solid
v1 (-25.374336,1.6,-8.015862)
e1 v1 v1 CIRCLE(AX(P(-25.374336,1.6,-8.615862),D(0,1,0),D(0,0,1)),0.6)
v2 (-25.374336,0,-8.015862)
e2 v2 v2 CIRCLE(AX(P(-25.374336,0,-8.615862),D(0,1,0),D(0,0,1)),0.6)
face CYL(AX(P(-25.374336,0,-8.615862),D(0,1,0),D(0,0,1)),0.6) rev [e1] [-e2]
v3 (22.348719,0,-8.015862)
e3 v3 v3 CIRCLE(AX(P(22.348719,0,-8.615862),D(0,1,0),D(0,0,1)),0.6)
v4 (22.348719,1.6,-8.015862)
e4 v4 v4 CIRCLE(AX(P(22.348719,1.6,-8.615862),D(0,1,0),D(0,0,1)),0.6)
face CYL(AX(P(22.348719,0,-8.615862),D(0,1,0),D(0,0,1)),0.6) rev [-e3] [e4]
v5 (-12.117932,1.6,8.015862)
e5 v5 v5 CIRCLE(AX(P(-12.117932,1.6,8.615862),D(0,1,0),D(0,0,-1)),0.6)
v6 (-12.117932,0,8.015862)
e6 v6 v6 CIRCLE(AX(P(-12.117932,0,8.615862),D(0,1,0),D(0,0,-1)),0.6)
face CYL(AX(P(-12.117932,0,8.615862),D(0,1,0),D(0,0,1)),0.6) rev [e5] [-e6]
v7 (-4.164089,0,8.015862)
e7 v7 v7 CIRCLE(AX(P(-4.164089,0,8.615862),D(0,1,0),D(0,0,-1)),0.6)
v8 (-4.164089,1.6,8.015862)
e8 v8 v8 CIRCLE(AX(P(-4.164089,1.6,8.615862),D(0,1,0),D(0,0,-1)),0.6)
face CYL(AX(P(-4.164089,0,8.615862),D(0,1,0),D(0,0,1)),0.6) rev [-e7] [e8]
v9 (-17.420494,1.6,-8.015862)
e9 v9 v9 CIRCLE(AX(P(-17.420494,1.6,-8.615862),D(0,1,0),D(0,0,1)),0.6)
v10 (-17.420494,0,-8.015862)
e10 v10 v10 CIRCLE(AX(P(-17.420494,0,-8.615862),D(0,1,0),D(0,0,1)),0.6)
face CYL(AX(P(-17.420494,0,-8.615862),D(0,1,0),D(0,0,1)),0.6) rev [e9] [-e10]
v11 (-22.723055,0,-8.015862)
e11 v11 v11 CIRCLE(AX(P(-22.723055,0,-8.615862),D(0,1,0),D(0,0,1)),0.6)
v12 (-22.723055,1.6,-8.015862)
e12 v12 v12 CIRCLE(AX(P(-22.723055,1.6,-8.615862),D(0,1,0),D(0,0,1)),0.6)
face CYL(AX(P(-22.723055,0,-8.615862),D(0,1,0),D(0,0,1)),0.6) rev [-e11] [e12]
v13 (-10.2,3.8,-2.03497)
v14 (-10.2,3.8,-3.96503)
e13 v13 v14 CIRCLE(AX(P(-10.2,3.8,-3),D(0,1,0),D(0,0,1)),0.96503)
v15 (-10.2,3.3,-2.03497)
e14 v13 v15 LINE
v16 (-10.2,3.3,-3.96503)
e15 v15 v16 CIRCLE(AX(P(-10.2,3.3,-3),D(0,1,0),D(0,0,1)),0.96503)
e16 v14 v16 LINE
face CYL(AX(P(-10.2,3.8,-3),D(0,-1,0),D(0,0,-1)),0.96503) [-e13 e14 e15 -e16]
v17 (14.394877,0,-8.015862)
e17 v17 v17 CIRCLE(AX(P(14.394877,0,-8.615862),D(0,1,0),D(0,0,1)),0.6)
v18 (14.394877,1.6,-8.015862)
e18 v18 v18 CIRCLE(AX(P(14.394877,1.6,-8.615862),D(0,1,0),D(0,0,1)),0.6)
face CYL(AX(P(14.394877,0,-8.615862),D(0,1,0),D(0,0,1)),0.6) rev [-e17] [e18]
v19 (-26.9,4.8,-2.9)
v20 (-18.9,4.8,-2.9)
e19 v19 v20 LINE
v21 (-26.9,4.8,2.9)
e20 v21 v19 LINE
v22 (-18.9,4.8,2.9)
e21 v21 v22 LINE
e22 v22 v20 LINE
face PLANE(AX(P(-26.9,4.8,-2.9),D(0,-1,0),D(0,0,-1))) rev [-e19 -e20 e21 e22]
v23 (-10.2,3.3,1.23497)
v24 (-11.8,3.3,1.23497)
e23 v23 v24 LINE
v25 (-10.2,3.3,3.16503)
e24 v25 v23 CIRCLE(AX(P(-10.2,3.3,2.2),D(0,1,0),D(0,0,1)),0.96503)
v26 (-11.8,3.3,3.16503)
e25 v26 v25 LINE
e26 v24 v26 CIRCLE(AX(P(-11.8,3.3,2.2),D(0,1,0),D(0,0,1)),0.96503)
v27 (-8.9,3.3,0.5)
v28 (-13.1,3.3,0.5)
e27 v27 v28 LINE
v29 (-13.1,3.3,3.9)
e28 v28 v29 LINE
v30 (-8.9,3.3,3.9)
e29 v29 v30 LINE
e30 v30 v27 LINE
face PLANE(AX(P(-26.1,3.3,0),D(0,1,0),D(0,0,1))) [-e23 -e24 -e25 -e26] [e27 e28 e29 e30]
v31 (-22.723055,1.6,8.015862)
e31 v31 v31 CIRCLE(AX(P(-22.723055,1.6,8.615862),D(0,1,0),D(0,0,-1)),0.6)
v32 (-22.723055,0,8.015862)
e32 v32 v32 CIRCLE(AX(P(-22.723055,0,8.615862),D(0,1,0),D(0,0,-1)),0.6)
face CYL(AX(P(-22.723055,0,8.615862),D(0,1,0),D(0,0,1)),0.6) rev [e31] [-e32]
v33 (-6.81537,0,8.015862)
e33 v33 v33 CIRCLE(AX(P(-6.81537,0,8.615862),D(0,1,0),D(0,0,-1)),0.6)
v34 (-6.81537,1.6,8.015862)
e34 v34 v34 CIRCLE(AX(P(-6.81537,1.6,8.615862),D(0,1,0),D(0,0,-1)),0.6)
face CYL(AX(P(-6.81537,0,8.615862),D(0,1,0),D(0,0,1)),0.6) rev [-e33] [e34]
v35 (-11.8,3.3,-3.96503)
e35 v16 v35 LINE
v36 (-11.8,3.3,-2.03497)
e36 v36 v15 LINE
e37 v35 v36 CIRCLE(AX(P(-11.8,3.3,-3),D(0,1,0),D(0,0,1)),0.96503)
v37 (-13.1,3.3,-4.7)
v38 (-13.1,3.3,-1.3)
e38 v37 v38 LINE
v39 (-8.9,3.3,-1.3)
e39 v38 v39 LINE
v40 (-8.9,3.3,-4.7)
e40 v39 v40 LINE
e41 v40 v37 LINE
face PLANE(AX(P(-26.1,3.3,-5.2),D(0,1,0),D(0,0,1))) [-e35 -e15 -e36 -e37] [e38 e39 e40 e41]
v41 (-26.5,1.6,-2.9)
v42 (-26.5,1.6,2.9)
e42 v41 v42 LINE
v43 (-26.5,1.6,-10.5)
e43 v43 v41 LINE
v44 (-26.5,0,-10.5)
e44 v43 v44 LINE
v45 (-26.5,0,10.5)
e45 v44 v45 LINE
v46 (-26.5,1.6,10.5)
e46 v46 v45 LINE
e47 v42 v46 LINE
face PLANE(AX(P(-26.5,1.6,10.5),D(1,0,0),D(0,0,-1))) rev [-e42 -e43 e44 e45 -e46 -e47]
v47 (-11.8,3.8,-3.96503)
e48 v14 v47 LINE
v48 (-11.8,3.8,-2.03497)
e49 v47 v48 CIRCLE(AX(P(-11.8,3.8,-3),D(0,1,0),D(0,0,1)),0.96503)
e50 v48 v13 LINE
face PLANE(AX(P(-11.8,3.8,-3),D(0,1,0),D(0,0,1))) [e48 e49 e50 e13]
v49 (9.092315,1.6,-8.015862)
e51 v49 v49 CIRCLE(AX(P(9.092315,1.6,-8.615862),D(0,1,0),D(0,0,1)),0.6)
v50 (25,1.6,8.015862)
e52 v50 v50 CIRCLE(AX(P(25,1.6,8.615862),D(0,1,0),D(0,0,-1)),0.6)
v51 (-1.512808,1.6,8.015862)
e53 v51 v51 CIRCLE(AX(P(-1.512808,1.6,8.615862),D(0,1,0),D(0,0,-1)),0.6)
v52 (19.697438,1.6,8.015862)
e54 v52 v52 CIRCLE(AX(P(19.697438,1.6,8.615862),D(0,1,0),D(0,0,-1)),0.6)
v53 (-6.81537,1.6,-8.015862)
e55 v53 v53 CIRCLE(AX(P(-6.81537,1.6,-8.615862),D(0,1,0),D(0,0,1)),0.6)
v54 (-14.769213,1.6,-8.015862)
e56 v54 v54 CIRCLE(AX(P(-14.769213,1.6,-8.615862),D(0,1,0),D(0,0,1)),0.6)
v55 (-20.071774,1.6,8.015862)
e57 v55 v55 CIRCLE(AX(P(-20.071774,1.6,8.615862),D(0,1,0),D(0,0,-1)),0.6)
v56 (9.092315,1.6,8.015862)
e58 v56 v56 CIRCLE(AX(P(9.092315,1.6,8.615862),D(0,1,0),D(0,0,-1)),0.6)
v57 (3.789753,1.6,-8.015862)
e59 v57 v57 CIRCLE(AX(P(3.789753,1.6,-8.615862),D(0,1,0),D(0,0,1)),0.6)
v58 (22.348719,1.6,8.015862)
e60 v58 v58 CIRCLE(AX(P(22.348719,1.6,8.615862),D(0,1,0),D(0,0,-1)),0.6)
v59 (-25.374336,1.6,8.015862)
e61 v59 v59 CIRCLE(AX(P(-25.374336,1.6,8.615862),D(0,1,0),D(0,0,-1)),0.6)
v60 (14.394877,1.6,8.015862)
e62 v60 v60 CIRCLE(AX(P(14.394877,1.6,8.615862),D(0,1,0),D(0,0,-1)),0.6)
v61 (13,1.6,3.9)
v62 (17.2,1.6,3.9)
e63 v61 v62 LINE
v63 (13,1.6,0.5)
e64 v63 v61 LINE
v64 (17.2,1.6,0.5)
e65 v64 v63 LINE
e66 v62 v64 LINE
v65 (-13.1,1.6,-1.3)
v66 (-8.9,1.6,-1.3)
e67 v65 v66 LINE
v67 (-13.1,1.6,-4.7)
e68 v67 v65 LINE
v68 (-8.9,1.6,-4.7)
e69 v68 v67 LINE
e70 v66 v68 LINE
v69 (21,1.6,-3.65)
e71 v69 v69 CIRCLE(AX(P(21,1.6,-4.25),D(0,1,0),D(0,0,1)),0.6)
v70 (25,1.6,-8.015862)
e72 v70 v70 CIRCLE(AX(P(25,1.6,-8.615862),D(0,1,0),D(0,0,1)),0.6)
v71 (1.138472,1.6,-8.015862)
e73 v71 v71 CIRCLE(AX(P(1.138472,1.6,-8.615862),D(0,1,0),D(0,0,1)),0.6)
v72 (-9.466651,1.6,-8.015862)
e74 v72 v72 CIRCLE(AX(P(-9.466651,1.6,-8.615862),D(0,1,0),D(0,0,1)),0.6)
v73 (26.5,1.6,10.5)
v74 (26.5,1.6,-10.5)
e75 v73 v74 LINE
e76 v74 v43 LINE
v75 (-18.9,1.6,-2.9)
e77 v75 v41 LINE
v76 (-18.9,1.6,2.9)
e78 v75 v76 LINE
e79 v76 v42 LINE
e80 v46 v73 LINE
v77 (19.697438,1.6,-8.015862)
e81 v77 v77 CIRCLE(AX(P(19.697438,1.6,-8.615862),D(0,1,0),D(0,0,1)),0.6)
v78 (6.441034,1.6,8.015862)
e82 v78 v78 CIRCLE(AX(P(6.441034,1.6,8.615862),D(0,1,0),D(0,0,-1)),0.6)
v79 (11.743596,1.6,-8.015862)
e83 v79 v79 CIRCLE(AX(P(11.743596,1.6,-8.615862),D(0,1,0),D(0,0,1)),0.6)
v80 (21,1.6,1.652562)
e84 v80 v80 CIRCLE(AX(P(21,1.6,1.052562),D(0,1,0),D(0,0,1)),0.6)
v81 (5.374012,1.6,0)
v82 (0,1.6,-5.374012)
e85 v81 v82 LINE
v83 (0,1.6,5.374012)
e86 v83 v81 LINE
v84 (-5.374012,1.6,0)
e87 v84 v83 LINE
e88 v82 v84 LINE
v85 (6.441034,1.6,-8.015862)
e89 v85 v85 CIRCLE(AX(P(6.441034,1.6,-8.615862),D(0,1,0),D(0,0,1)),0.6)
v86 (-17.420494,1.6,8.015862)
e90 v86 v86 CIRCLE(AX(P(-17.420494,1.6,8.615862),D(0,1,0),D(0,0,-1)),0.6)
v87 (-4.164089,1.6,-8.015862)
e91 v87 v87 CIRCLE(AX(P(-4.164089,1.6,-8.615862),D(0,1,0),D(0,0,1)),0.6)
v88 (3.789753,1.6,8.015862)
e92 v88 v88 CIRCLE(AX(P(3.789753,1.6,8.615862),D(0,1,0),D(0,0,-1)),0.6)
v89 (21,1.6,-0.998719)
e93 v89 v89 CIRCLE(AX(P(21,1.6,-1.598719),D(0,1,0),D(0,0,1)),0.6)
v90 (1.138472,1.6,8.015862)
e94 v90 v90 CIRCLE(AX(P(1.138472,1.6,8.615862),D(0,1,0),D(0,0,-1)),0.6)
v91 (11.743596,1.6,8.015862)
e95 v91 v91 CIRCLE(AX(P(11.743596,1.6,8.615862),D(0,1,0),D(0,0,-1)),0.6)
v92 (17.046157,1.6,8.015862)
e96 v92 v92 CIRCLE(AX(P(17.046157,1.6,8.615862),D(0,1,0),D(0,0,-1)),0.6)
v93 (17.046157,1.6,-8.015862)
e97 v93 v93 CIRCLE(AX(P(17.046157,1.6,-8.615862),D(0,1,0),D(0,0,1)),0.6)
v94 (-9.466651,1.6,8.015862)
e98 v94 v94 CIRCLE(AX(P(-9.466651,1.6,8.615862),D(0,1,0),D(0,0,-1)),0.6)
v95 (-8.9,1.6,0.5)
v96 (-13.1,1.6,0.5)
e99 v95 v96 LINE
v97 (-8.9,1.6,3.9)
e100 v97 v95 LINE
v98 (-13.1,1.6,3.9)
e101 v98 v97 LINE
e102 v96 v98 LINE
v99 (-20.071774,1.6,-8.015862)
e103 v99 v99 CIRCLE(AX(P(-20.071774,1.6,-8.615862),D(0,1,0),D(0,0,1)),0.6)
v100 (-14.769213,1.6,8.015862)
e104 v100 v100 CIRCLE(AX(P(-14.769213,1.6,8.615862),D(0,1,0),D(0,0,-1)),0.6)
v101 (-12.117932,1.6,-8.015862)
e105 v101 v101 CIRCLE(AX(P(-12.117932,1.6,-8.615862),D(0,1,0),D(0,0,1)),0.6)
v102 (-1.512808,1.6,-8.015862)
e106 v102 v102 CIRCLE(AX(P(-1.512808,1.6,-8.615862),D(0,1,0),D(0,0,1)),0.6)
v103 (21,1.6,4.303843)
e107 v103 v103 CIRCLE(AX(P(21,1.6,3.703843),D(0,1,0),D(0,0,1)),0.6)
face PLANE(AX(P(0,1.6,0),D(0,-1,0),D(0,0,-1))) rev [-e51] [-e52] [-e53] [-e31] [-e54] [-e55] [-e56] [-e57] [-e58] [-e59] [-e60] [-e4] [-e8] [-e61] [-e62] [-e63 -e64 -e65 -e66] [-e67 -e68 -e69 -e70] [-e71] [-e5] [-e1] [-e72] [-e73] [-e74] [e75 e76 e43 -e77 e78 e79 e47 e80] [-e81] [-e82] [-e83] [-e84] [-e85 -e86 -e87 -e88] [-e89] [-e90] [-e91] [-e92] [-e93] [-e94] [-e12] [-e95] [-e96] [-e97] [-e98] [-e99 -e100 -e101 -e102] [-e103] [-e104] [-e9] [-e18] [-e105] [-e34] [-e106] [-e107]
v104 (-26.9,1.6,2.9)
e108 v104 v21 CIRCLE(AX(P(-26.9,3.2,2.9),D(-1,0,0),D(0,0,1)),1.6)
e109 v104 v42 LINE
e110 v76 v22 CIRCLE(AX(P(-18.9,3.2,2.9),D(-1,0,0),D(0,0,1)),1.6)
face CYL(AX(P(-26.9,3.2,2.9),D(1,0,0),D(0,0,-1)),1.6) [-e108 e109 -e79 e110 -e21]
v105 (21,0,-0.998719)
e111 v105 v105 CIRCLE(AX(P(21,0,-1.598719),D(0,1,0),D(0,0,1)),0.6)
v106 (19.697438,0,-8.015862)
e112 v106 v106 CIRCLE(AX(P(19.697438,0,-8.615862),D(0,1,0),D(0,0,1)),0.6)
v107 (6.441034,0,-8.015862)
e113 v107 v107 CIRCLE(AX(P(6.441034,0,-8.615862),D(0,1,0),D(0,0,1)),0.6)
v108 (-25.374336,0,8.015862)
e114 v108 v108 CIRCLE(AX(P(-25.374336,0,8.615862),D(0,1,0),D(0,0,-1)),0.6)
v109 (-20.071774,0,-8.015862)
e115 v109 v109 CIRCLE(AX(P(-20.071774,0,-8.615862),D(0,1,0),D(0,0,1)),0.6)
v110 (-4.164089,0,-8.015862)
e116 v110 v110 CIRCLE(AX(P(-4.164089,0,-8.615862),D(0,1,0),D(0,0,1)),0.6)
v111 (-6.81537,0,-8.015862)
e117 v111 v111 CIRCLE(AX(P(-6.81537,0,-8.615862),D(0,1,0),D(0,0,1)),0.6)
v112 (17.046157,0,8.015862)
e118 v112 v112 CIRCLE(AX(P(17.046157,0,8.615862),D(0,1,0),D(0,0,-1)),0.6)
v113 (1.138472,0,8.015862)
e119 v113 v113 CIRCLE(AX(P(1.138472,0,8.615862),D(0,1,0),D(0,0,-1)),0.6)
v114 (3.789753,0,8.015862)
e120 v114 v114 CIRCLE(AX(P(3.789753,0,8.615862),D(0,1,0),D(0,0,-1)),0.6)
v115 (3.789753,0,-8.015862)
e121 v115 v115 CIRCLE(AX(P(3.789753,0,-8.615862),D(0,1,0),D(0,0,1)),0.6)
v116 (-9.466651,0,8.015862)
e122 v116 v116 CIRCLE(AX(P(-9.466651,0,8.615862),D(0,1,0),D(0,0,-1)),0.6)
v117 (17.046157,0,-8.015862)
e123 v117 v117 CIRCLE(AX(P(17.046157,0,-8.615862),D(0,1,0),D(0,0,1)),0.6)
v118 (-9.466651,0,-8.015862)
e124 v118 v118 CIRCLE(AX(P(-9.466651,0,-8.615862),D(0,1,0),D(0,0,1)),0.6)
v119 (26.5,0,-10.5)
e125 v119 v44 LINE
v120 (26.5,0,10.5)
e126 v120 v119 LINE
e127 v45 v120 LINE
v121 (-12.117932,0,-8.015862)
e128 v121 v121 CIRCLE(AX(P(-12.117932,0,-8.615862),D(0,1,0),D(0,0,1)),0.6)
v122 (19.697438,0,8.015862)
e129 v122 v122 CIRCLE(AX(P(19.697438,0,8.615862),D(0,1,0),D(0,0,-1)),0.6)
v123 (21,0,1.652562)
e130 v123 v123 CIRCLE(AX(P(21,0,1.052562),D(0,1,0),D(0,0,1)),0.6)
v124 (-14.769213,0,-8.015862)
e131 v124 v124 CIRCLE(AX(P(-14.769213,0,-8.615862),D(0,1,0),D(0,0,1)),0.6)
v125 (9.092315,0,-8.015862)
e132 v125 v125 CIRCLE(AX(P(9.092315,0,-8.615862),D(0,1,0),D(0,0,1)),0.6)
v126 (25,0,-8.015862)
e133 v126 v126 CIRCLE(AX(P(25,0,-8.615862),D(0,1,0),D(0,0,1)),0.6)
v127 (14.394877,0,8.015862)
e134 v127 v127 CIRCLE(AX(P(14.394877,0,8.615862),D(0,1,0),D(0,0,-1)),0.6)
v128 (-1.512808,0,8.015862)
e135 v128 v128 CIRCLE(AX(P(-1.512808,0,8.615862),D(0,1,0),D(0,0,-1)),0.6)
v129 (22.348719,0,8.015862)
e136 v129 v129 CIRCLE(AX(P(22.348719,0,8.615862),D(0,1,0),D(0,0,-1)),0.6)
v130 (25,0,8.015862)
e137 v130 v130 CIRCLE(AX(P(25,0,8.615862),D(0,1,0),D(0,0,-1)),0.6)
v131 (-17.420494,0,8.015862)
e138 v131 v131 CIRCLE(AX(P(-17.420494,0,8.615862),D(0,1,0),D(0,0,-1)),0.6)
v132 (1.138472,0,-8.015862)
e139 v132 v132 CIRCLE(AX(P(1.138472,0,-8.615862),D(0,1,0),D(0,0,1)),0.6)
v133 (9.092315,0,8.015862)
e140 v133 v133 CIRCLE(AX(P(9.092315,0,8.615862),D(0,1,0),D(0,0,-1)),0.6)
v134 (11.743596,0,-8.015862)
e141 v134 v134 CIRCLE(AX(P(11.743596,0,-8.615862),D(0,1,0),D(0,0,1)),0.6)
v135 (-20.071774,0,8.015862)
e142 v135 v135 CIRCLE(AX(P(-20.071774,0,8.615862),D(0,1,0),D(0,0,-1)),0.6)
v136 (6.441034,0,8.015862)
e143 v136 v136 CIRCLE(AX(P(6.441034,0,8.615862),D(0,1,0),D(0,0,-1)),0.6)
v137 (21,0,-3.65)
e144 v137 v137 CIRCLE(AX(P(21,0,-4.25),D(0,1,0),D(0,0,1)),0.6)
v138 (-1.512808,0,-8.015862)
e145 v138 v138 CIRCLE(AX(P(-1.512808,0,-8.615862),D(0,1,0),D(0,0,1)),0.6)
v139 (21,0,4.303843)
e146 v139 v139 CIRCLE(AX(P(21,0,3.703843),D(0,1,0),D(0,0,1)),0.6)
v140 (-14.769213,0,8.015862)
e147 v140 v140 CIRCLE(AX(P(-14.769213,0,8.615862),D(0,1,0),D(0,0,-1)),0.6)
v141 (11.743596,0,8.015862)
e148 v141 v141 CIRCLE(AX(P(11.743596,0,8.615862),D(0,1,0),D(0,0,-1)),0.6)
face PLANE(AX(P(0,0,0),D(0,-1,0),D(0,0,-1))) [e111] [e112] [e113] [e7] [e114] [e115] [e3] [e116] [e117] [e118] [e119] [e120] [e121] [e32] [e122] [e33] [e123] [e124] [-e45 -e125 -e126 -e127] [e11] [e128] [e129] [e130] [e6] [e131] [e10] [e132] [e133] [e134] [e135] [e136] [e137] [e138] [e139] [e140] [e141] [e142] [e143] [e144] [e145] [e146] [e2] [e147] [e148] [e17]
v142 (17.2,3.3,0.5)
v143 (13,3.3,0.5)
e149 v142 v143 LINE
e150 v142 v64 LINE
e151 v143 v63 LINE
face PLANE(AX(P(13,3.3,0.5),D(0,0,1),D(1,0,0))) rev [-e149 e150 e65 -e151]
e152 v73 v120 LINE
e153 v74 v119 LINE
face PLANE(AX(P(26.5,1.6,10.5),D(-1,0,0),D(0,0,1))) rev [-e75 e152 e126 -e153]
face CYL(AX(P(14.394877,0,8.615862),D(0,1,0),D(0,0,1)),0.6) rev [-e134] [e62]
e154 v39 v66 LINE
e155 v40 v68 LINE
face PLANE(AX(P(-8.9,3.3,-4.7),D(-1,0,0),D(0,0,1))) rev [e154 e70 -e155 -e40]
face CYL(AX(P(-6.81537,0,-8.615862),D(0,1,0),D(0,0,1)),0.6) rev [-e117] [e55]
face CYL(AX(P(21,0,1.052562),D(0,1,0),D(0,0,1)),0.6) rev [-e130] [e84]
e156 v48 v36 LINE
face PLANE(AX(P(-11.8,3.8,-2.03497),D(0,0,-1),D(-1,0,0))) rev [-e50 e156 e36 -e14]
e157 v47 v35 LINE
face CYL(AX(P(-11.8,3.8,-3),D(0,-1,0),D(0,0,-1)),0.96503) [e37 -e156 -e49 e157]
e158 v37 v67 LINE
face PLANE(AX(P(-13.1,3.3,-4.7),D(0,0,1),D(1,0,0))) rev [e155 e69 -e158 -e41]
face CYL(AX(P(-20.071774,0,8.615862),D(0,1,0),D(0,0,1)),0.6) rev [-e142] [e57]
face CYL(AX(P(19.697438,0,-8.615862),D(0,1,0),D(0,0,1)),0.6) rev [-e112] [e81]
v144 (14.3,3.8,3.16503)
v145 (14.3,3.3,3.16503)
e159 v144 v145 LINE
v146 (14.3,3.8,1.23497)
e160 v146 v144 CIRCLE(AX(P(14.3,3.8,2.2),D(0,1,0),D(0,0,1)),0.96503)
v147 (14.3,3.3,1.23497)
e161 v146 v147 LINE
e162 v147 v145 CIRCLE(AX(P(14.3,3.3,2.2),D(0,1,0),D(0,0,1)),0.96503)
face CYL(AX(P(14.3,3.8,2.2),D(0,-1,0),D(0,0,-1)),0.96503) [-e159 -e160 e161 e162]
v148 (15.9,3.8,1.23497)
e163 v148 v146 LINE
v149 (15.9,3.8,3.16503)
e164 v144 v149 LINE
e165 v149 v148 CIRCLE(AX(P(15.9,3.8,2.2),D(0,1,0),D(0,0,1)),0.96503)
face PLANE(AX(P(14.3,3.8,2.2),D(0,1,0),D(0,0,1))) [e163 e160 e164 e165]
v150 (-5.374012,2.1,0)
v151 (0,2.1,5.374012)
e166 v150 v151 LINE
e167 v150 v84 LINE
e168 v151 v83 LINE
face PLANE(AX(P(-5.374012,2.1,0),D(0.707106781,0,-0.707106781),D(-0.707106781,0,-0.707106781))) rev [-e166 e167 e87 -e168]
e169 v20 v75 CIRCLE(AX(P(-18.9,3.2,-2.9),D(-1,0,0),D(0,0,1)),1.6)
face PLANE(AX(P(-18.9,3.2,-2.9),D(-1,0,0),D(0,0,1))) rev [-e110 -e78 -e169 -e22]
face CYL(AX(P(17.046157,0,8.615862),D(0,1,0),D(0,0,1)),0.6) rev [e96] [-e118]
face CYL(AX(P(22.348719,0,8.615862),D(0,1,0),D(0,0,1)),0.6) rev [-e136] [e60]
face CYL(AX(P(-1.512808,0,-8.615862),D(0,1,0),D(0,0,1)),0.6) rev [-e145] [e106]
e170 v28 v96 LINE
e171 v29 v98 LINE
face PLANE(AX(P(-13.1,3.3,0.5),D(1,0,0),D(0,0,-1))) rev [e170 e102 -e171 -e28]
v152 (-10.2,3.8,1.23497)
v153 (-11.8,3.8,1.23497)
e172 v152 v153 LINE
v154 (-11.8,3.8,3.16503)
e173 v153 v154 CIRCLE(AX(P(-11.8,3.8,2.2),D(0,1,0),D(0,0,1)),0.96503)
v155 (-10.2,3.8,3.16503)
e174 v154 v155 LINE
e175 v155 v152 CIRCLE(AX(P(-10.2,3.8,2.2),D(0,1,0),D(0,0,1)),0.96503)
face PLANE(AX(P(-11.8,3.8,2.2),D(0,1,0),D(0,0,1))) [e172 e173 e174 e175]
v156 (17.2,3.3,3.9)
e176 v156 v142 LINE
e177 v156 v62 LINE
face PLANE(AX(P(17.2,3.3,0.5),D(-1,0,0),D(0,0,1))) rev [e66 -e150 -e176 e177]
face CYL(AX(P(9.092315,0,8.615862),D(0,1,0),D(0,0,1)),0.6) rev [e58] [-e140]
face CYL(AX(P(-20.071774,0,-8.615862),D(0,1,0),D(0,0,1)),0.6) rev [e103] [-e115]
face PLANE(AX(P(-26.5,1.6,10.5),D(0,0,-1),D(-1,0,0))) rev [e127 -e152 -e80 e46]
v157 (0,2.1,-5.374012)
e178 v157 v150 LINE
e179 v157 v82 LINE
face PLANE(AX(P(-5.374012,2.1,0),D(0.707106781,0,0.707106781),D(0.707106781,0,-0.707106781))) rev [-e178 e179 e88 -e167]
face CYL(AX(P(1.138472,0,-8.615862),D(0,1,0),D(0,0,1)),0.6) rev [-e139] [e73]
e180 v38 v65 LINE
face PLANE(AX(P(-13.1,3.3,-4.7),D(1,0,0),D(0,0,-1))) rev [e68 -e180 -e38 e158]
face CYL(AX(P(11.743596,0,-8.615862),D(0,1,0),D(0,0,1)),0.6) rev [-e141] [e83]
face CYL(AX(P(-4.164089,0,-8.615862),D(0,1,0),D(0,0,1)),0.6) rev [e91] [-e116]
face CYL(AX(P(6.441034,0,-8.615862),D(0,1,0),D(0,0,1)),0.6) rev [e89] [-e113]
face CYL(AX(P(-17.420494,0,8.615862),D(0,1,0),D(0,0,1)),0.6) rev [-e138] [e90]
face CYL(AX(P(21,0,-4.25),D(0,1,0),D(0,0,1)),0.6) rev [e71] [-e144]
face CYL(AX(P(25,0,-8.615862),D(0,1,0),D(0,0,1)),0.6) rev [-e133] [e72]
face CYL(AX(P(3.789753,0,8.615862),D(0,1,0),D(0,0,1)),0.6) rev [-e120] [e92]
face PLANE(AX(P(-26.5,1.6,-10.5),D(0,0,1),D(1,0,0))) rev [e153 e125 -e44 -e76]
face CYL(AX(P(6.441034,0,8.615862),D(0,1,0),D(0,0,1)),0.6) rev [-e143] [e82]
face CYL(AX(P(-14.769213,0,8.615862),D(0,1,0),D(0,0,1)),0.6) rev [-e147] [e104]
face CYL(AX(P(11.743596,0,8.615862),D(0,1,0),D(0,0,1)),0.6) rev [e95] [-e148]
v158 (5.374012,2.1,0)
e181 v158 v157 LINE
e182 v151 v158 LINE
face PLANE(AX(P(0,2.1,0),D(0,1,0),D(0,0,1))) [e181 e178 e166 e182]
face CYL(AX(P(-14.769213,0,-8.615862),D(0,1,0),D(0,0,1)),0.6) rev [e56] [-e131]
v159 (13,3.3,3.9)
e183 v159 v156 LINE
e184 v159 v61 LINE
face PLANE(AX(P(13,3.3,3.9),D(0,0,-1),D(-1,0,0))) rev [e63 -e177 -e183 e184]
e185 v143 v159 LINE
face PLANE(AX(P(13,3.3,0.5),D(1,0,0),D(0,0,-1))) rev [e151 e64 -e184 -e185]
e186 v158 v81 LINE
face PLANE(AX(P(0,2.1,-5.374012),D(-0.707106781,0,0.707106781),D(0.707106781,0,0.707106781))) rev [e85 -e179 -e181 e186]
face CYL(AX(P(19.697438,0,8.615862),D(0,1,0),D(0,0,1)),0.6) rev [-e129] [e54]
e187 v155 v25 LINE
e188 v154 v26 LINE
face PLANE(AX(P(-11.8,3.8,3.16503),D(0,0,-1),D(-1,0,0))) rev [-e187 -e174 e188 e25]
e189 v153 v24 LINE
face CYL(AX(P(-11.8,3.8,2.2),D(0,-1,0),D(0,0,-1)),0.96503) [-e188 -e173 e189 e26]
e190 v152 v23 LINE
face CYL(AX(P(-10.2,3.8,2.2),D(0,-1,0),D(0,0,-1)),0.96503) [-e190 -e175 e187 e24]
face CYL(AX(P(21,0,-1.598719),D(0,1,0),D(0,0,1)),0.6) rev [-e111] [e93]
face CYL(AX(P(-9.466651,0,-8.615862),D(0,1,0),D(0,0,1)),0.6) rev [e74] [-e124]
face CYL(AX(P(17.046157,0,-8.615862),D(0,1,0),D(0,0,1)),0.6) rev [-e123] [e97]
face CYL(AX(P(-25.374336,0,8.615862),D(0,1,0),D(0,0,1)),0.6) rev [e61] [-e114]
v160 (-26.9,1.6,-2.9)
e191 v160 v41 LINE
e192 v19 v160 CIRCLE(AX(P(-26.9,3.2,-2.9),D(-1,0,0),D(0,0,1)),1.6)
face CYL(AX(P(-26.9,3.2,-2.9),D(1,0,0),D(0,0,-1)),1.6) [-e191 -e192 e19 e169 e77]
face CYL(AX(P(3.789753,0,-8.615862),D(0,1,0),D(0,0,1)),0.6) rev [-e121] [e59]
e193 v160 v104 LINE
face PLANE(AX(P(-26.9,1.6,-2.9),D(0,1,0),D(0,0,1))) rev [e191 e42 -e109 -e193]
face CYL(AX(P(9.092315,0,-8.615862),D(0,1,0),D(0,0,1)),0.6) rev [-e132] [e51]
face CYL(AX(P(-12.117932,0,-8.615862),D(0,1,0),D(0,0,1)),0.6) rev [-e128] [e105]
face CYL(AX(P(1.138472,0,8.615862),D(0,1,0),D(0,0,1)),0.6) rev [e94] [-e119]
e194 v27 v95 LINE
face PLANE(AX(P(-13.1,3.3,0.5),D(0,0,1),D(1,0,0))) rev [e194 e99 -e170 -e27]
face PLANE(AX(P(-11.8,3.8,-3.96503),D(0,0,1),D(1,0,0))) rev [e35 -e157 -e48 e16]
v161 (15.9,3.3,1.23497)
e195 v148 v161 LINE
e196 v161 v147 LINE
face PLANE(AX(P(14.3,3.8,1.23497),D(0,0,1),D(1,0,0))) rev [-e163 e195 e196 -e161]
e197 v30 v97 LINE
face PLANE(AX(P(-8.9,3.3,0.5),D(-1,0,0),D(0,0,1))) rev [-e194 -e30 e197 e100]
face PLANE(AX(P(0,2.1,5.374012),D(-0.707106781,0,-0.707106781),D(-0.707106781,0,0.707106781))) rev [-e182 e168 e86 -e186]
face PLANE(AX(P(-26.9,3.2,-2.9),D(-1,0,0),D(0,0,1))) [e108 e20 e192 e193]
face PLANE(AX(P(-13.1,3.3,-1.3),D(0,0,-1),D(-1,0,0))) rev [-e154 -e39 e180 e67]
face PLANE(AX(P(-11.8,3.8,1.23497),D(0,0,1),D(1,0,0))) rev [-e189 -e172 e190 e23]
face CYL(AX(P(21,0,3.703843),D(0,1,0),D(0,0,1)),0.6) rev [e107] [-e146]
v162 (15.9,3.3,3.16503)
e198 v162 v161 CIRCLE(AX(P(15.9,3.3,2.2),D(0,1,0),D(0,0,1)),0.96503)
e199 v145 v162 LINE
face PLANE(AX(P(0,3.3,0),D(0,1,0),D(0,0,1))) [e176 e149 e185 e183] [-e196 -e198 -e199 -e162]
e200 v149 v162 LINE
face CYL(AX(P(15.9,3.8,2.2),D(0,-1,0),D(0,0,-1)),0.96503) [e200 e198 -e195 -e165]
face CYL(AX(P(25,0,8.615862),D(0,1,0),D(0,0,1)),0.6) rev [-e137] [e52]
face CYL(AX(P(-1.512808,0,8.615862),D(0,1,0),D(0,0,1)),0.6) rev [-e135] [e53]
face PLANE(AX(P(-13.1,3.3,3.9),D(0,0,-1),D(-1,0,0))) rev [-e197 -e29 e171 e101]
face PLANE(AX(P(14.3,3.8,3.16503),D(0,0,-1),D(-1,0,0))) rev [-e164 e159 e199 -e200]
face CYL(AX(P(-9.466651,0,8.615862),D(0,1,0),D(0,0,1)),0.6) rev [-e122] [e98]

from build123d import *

# Parameters (mm, degrees)
SKETCH1_W                 = 53
SKETCH1_H                 = 21
BOSS_EXTRUDE1_DEPTH       = 1.6
BOSS_EXTRUDE2_DEPTH       = 0.4
BOSS_EXTRUDE2_DEPTH_BACK  = 7.6
SKETCH3_W                 = 4.2
SKETCH3_H                 = 3.4
BOSS_EXTRUDE3_DEPTH       = 1.7
BOSS_EXTRUDE4_DEPTH       = 0.5
SKETCH_PATTERN1_START     = 1.6
SKETCH_PATTERN1_OUTLINE_W = 4.2
SKETCH_PATTERN1_OUTLINE_H = 3.4
SKETCH_PATTERN1_DEPTH     = 1.7
SKETCH_PATTERN1_START_2   = 3.3
SKETCH_PATTERN1_2_DEPTH   = 0.5
SKETCH6_R                 = 0.6
CUT_EXTRUDE1_DEPTH        = 30.053399113
LPATTERN1_COUNT           = 20
LPATTERN1_PITCH           = 2.65128085
BOSS_EXTRUDE5_DEPTH       = 0.5
SKETCH8_R                 = 0.6
CUT_EXTRUDE2_DEPTH        = 30.053399113
LPATTERN2_COUNT           = 4
LPATTERN2_PITCH           = 2.65128085


# Read off the part's stored shape, not the designer's step: Sketch-Pattern1
with BuildPart() as part:
    # Sketch1 → Boss-Extrude1 (new body)
    with BuildSketch(Plane(origin=(0, 0, 0), x_dir=(1, 0, 0), z_dir=(0, 1, 0))):
        Rectangle(SKETCH1_W, SKETCH1_H)
    extrude(amount=BOSS_EXTRUDE1_DEPTH)

    # Sketch2 → Boss-Extrude2 (add, two sides: drawn at the far end of the back side and taken through both)
    with BuildSketch(Plane.ZY.offset(26.5).offset(-BOSS_EXTRUDE2_DEPTH_BACK)):
        with BuildLine():
            Line((-2.9, 4.8), (2.9, 4.8))
            ThreePointArc((2.9, 4.8), (4.5, 3.2), (2.9, 1.6))
            Line((2.9, 1.6), (-2.9, 1.6))
            ThreePointArc((-2.9, 1.6), (-4.5, 3.2), (-2.9, 4.8))
        make_face()
    extrude(amount=BOSS_EXTRUDE2_DEPTH + BOSS_EXTRUDE2_DEPTH_BACK)

    # Sketch3 → Boss-Extrude3 (add)
    with BuildSketch(Plane(origin=(0, 1.6, 0), x_dir=(1, 0, 0), z_dir=(0, 1, 0))):
        with Locations((15.1, -2.2)):
            Rectangle(SKETCH3_W, SKETCH3_H)
    extrude(amount=BOSS_EXTRUDE3_DEPTH)

    # Sketch4 → Boss-Extrude4 (add)
    with BuildSketch(Plane(origin=(0, 3.3, 0), x_dir=(1, 0, 0), z_dir=(0, 1, 0))):
        with BuildLine():
            Line((14.3, -1.234969734), (15.9, -1.234969734))
            ThreePointArc((15.9, -1.234969734), (16.865030266, -2.2), (15.9, -3.165030266))
            Line((15.9, -3.165030266), (14.3, -3.165030266))
            ThreePointArc((14.3, -3.165030266), (13.334969734, -2.2), (14.3, -1.234969734))
        make_face()
    extrude(amount=BOSS_EXTRUDE4_DEPTH)

    # Sketch-Pattern1 outline → Sketch-Pattern1 (add)
    with BuildSketch(Plane(origin=(0, 0, 0), x_dir=(1, 0, 0), z_dir=(0, 1, 0)).offset(SKETCH_PATTERN1_START)):
        with Locations((-11, -2.2)):
            Rectangle(SKETCH_PATTERN1_OUTLINE_W, SKETCH_PATTERN1_OUTLINE_H)
        with Locations((-11, 3)):
            Rectangle(SKETCH_PATTERN1_OUTLINE_W, SKETCH_PATTERN1_OUTLINE_H)
    extrude(amount=SKETCH_PATTERN1_DEPTH)

    # Sketch-Pattern1 2 outline → Sketch-Pattern1 2 (add)
    with BuildSketch(Plane(origin=(0, 0, 0), x_dir=(1, 0, 0), z_dir=(0, 1, 0)).offset(SKETCH_PATTERN1_START_2)):
        with BuildLine():
            Line((-11.8, -3.165030266), (-10.2, -3.165030266))
            ThreePointArc((-10.2, -3.165030266), (-9.234969734, -2.2), (-10.2, -1.234969734))
            Line((-10.2, -1.234969734), (-11.8, -1.234969734))
            ThreePointArc((-11.8, -1.234969734), (-12.765030266, -2.2), (-11.8, -3.165030266))
        make_face()
        with BuildLine():
            ThreePointArc((-11.8, 3.965030266), (-12.765030266, 3), (-11.8, 2.034969734))
            Line((-11.8, 2.034969734), (-10.2, 2.034969734))
            ThreePointArc((-10.2, 2.034969734), (-9.234969734, 3), (-10.2, 3.965030266))
            Line((-10.2, 3.965030266), (-11.8, 3.965030266))
        make_face()
    extrude(amount=SKETCH_PATTERN1_2_DEPTH)

    # Sketch6 → Cut-Extrude1 (cut, through all)
    with BuildSketch(Plane(origin=(0, 1.6, 0), x_dir=(1, 0, 0), z_dir=(0, 1, 0))):
        with Locations(Location((-25.374336146, 8.615861733, 0), (0, 0, 270))):
            Circle(SKETCH6_R)
        with Locations(Location((-25.374336146, -8.615861733, 0), (0, 0, 90))):
            Circle(SKETCH6_R)
    cut_extrude1 = extrude(amount=-CUT_EXTRUDE1_DEPTH, mode=Mode.SUBTRACT)

    # LPattern1: Cut-Extrude1 ×20
    with Locations(*[(i * LPATTERN1_PITCH, 0, 0) for i in range(1, LPATTERN1_COUNT)]):
        add(cut_extrude1, mode=Mode.SUBTRACT)

    # Sketch7 → Boss-Extrude5 (add)
    with BuildSketch(Plane(origin=(0, 1.6, 0), x_dir=(1, 0, 0), z_dir=(0, 1, 0))):
        Polygon((-5.374011537, 0), (0, 5.374011537), (5.374011537, 0), (0, -5.374011537), align=None)
    extrude(amount=BOSS_EXTRUDE5_DEPTH)

    # Sketch8 → Cut-Extrude2 (cut, through all)
    with BuildSketch(Plane(origin=(0, 1.6, 0), x_dir=(1, 0, 0), z_dir=(0, 1, 0))):
        with Locations(Location((21, 4.25, 0), (0, 0, 270))):
            Circle(SKETCH8_R)
    cut_extrude2 = extrude(amount=-CUT_EXTRUDE2_DEPTH, mode=Mode.SUBTRACT)

    # LPattern2: Cut-Extrude2 ×4
    with Locations(*[(0, 0, i * LPATTERN2_PITCH) for i in range(1, LPATTERN2_COUNT)]):
        add(cut_extrude2, mode=Mode.SUBTRACT)


solid = part.part
